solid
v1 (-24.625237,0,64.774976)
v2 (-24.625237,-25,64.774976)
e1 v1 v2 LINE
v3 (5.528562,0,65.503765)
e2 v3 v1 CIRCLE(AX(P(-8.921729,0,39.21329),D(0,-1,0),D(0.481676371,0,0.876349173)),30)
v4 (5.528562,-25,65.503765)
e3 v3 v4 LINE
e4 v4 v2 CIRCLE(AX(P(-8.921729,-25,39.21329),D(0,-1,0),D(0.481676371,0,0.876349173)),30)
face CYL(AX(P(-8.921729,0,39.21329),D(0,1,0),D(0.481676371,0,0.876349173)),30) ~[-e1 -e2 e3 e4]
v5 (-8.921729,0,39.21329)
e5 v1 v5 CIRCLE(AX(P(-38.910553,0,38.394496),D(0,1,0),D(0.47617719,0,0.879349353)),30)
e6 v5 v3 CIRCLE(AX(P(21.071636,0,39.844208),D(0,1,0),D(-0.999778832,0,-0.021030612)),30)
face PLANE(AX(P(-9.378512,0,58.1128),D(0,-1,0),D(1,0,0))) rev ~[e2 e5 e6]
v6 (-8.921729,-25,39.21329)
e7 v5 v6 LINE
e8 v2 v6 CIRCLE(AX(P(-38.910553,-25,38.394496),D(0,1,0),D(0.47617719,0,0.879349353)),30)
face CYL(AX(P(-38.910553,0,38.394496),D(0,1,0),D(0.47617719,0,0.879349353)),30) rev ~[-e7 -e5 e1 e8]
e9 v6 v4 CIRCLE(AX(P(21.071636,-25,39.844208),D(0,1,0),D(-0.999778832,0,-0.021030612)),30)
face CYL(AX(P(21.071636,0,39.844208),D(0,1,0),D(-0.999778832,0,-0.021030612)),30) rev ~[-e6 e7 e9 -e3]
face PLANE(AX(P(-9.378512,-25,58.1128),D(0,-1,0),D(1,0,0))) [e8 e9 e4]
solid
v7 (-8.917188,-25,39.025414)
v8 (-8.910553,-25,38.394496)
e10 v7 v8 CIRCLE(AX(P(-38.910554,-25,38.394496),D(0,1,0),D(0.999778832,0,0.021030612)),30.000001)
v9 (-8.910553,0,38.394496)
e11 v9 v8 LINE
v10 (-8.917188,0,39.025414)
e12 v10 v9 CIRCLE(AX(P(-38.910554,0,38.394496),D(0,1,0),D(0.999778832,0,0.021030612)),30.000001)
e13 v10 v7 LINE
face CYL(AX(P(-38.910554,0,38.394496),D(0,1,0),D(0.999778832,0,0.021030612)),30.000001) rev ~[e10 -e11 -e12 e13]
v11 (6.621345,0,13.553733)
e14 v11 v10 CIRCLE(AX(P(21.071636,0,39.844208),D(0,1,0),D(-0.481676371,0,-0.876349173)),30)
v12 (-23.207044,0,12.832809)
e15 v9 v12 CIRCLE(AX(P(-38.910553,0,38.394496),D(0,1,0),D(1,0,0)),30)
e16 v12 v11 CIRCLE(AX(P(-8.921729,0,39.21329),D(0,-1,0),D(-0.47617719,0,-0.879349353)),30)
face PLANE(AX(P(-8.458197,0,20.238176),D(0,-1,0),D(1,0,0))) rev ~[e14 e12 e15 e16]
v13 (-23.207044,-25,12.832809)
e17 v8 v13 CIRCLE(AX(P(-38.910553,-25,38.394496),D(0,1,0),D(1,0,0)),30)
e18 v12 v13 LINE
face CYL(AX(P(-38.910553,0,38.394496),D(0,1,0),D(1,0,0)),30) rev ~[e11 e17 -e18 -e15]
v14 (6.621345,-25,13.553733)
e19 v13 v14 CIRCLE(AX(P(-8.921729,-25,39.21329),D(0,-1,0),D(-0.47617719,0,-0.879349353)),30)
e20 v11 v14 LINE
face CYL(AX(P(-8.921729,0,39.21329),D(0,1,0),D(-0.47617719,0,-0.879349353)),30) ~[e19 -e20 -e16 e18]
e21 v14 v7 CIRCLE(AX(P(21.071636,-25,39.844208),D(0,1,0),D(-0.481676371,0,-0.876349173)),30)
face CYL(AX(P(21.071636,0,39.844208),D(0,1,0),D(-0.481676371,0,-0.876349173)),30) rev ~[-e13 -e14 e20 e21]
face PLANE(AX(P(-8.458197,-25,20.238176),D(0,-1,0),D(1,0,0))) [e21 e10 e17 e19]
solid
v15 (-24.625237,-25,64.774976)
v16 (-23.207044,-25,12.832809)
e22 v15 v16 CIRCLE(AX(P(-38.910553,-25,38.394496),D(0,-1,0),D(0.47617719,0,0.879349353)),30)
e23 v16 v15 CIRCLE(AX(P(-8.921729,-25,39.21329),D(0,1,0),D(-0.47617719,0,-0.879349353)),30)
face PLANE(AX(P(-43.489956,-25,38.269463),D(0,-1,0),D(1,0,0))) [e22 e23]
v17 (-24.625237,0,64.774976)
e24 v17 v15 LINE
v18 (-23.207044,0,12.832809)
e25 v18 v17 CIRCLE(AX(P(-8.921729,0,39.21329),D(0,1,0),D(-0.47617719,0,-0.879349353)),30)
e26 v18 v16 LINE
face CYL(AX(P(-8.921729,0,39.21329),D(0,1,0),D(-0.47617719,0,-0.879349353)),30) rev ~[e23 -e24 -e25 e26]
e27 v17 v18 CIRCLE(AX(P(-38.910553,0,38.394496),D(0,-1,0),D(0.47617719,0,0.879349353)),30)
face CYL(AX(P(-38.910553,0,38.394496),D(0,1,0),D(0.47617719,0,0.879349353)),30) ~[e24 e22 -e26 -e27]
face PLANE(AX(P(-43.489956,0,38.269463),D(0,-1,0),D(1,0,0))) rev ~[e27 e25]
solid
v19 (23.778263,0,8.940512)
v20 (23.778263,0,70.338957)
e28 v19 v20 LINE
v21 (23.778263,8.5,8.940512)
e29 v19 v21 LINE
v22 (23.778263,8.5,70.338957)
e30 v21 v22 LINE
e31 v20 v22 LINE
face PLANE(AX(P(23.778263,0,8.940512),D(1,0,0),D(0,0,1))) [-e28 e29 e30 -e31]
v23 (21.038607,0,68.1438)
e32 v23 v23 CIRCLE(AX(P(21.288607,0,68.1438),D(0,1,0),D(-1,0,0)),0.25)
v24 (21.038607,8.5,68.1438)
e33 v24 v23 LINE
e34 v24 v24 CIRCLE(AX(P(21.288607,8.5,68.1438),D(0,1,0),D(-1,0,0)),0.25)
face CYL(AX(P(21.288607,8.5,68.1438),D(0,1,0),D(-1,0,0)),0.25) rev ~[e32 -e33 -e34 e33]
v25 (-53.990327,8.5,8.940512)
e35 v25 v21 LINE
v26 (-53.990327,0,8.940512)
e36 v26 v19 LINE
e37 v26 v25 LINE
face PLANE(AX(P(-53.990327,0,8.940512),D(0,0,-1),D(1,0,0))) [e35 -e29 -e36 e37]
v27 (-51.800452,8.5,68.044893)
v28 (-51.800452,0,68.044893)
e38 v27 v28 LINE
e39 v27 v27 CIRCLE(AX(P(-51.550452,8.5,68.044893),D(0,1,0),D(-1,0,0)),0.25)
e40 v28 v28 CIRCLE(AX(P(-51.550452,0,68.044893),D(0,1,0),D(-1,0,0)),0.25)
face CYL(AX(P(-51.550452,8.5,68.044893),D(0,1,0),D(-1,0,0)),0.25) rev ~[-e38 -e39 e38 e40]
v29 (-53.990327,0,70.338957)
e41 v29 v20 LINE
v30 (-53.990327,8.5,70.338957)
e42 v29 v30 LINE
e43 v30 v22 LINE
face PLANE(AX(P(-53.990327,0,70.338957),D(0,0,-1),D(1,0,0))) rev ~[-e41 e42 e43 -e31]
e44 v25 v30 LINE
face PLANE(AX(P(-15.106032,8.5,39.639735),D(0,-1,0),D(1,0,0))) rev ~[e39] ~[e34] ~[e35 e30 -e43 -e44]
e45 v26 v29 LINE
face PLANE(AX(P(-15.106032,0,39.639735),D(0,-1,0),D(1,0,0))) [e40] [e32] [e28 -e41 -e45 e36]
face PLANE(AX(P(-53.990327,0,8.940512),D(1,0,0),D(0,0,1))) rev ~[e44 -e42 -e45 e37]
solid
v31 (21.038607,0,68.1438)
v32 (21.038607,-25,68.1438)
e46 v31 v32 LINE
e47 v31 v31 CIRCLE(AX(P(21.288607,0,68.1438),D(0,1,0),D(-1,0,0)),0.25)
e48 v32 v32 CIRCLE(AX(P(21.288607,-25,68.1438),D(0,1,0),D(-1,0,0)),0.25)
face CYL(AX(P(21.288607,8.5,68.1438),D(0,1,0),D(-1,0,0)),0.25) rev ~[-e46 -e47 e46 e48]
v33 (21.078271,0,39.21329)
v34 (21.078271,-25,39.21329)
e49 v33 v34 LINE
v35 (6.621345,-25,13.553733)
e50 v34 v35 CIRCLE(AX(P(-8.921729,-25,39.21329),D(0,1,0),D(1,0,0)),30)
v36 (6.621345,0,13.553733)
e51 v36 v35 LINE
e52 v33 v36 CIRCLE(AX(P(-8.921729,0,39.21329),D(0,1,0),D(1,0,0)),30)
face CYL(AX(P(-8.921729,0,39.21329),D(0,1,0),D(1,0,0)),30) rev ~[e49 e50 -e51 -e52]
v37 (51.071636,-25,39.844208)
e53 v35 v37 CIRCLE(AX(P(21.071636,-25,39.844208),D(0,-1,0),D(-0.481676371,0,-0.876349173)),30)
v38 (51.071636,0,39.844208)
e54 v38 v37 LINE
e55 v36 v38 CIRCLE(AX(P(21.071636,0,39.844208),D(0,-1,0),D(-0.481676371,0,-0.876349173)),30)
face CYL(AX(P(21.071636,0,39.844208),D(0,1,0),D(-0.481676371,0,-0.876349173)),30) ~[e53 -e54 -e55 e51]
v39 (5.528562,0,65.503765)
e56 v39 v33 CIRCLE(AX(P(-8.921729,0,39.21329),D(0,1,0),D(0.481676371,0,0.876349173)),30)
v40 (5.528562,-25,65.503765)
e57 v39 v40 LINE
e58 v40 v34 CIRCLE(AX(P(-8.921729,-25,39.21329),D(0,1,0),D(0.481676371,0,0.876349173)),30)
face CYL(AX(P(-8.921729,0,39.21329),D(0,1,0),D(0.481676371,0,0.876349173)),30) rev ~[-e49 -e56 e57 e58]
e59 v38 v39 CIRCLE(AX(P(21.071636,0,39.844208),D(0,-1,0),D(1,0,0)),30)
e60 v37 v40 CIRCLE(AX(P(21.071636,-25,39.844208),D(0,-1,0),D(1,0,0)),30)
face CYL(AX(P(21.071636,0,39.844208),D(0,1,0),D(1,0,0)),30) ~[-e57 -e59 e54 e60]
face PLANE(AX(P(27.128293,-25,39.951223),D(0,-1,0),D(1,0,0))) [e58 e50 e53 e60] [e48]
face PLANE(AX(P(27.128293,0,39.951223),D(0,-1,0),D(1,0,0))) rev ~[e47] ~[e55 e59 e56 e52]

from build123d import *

# Parameters (mm, degrees)
F1_DEPTH = 25
F2_W     = 77.7685903013
F2_H     = 61.3984446973
F3_DEPTH = 8.5
F4_R     = 0.25
F5_DEPTH = 52.9


with BuildPart() as f1:
    # F0 (on Front) → F1 (new body)
    with BuildSketch(Plane.XZ):
        with BuildLine():
            ThreePointArc((-24.6252371606, 64.7749764202), (-68.899377051, 37.5757018533), (-23.2070443664, 12.832809261))
            ThreePointArc((-23.2070443664, 12.832809261), (-38.9105528593, 38.3944958448), (-24.6252371606, 64.7749764202))
        make_face()
    extrude(amount=F1_DEPTH)


with BuildPart() as f1b:
    # F0 (on Front) → F1, piece 2 (new body)
    with BuildSketch(Plane.XZ):
        with BuildLine():
            ThreePointArc((21.0782713324, 39.2132898363), (17.2153351945, 24.4873300147), (6.6213451544, 13.553733017))
            ThreePointArc((6.6213451544, 13.553733017), (36.3440176728, 14.0226209778), (51.0716362988, 39.8442082095))
            ThreePointArc((51.0716362988, 39.8442082095), (35.7975961204, 65.9812720716), (5.5285624767, 65.5037650288))
            ThreePointArc((5.5285624767, 65.5037650288), (16.8998585641, 54.4856712104), (21.0782713324, 39.2132898363))
        make_face()
    extrude(amount=F1_DEPTH)


with BuildPart() as f1c:
    # F0 (on Front) → F1, piece 3 (new body)
    with BuildSketch(Plane.XZ):
        with BuildLine():
            ThreePointArc((-24.6252371606, 64.7749764202), (-13.3488662754, 54.0980043378), (-8.9217286676, 39.2132898363))
            ThreePointArc((-8.9217286676, 39.2132898363), (-5.2188388937, 54.2944993538), (5.5285624767, 65.5037650288))
            ThreePointArc((5.5285624767, 65.5037650288), (-9.6465884056, 69.2045315305), (-24.6252371606, 64.7749764202))
        make_face()
    extrude(amount=F1_DEPTH)


with BuildPart() as f1d:
    # F0 (on Front) → F1, piece 4 (new body)
    with BuildSketch(Plane.XZ):
        with BuildLine():
            ThreePointArc((-8.9171878929, 39.025414218), (-8.9122116636, 38.7099724752), (-8.9105528593, 38.3944958448))
            ThreePointArc((-8.9105528593, 38.3944958448), (-12.7274929275, 23.7504741088), (-23.2070443664, 12.832809261))
            ThreePointArc((-23.2070443664, 12.832809261), (-8.1968689297, 9.2220481421), (6.6213451544, 13.553733017))
            ThreePointArc((6.6213451544, 13.553733017), (-4.5391110305, 24.2208404151), (-8.9171878929, 39.025414218))
        make_face()
    extrude(amount=F1_DEPTH)


with BuildPart() as f3:
    # F2 (on Front) → F3 (new body)
    with BuildSketch(Plane.XZ):
        with Locations((-15.1060316712, 39.6397346631)):
            Rectangle(F2_W, F2_H)
    extrude(amount=-F3_DEPTH)


with BuildPart() as f5_tool:
    # F4 (on face) → F5 (new body)
    with BuildSketch(Plane(origin=(0, 8.5, 0), x_dir=(-1, 0, 0), z_dir=(0, 1, 0))):
        with Locations((-21.2886072695, 68.143799901)):
            Circle(F4_R)
        with Locations((51.5504516661, 68.0448934436)):
            Circle(F4_R)
    extrude(amount=-F5_DEPTH)


with BuildPart() as f1b_1:
    add(f1b.part)

    # F5: cut by f5_tool
    add(f5_tool.part, mode=Mode.SUBTRACT)


with BuildPart() as f3_1:
    add(f3.part)

    # F5: cut by f5_tool
    add(f5_tool.part, mode=Mode.SUBTRACT)


solid = Compound([f1.part, f1c.part, f1d.part, f1b_1.part, f3_1.part])
